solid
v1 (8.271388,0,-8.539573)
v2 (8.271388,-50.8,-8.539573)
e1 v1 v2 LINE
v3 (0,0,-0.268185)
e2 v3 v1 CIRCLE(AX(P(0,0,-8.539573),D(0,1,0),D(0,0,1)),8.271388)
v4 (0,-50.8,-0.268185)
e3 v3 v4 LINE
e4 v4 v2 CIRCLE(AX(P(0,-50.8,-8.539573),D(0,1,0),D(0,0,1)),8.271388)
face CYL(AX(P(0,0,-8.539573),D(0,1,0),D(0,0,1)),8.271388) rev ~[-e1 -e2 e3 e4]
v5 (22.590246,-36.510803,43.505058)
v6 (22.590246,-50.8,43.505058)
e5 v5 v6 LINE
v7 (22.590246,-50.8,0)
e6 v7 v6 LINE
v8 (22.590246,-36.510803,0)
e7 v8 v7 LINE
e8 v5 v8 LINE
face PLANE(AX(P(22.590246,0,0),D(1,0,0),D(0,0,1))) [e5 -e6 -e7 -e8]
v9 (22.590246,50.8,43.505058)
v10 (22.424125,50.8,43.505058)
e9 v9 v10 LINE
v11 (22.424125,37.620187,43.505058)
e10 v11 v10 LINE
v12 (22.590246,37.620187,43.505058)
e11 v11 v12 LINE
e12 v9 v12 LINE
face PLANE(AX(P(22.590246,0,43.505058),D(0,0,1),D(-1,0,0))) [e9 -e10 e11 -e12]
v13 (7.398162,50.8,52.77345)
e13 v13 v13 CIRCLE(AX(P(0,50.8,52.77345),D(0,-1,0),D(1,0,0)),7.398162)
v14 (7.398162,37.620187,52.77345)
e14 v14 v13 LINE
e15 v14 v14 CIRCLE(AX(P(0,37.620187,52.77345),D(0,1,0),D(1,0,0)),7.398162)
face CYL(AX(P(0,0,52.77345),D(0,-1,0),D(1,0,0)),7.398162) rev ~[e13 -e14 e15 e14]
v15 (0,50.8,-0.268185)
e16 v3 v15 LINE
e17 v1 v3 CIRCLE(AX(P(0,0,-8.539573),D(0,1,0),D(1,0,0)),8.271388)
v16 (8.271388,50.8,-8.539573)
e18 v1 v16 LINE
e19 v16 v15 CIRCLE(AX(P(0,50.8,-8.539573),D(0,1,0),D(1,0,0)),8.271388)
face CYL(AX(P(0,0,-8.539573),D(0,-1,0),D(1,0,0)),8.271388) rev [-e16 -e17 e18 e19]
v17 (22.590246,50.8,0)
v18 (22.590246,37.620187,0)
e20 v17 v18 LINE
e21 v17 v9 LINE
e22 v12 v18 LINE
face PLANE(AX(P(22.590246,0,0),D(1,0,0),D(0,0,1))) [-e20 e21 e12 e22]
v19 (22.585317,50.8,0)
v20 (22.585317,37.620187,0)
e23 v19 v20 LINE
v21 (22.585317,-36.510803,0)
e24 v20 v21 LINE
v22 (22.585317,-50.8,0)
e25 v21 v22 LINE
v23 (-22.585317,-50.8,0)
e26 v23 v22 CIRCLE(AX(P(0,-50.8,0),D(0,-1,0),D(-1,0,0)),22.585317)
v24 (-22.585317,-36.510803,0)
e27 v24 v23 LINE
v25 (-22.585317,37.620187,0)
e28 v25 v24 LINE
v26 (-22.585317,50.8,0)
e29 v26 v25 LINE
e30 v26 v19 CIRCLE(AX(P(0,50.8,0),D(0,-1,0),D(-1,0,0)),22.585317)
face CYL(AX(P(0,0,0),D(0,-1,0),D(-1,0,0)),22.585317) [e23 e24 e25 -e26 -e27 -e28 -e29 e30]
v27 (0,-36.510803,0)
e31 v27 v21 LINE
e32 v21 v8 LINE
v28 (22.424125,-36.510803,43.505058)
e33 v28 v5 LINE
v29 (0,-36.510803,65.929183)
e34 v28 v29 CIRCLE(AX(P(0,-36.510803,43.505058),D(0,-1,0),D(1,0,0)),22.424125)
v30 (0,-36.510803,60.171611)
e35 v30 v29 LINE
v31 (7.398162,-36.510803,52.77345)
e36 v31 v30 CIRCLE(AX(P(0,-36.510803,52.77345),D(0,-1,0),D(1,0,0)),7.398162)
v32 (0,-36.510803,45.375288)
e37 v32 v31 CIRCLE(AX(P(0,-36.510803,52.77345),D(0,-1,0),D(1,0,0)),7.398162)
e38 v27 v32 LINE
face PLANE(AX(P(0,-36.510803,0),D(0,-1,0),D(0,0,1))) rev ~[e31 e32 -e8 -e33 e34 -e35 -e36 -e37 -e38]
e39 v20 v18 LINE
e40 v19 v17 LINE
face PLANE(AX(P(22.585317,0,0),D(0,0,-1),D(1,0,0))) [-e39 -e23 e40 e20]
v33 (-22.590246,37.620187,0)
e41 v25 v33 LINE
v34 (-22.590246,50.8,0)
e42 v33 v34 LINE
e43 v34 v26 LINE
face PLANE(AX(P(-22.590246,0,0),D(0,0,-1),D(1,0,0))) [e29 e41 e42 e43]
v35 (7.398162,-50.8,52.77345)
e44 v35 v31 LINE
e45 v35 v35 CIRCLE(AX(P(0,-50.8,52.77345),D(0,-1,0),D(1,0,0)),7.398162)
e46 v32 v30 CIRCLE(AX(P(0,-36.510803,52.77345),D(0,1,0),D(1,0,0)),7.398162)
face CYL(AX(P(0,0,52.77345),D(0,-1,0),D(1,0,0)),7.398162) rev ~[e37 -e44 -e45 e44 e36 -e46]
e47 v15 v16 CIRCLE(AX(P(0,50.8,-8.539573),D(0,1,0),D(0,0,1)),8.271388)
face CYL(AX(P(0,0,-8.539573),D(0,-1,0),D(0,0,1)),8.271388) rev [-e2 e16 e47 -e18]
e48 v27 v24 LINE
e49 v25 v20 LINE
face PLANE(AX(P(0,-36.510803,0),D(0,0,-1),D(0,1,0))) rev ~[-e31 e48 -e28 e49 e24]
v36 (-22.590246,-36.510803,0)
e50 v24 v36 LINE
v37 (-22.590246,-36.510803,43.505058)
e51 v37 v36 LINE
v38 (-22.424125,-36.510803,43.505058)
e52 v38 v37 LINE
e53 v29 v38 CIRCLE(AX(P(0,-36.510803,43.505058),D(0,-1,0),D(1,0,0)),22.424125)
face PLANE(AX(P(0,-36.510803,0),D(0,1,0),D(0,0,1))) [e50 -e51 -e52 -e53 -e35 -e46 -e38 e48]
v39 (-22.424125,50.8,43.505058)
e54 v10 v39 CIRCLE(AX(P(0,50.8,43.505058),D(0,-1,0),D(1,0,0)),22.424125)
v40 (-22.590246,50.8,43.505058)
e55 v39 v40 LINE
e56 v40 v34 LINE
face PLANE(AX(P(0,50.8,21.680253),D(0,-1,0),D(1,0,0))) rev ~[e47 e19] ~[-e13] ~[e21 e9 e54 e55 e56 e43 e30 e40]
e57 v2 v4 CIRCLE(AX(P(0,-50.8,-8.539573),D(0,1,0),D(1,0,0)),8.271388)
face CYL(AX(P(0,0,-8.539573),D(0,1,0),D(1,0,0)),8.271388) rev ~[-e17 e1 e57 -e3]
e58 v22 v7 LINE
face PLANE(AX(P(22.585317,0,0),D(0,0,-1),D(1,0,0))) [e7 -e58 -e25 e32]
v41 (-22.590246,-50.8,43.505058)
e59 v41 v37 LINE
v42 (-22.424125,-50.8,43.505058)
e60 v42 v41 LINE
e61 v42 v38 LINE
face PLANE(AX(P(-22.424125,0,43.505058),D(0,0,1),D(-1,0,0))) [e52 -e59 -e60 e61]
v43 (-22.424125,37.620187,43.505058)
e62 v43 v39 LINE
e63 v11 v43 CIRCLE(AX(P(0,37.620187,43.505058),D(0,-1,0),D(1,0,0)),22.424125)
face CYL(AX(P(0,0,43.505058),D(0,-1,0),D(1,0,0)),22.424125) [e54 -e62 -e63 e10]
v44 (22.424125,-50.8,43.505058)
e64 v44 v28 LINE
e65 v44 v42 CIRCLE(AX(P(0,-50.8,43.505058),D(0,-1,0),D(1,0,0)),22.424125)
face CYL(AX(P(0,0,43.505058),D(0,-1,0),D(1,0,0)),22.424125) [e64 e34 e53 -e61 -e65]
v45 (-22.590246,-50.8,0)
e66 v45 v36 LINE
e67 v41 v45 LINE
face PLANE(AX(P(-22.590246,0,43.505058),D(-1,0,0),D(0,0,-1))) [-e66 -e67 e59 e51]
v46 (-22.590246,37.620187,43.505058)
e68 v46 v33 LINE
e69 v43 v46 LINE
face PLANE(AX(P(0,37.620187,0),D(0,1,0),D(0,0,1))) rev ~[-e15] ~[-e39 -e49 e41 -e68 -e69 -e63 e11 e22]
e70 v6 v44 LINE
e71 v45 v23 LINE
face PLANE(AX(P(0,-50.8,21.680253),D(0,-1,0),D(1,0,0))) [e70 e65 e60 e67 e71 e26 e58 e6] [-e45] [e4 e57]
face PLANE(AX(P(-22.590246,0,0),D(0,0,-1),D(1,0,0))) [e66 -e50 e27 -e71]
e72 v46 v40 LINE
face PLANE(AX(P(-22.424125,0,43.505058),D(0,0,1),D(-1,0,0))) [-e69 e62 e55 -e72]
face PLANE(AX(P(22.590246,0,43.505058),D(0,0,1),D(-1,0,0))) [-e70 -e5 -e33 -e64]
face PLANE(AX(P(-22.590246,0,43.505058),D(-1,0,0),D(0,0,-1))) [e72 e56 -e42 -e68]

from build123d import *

# Parameters (mm, degrees)
F0_R          = 7.3981618973
F1_DEPTH      = 50.8
F1_DEPTH_BACK = 50.8
F2_W          = 74.1309896111
F2_H          = 66.0332143307
F3_DEPTH      = 25.4
F3_DEPTH_BACK = 25.4


# Not quite as in the source:
# - the program builds the solid bodies; features that only make, move or delete a surface that nothing else refers to are left out


with BuildPart() as f1:
    # F0 (on Front) → F1 (new body, two sides)
    with BuildSketch(Plane.XZ) as f1_sk:
        with BuildLine():
            Line((-22.5902460515, 0), (-22.5853170946, 0))
            ThreePointArc((-22.5853170946, 0), (0, -22.5853170946), (22.5853170946, 0))
            Line((22.5853170946, 0), (22.5902460515, 0))
            Line((22.5902460515, 0), (22.5902460515, 43.5050576925))
            Line((22.5902460515, 43.5050576925), (22.4241250182, 43.5050576925))
            ThreePointArc((22.4241250182, 43.5050576925), (0, 65.9291827108), (-22.4241250182, 43.5050576925))
            Line((-22.4241250182, 43.5050576925), (-22.5902460515, 43.5050576925))
            Line((-22.5902460515, 43.5050576925), (-22.5902460515, 0))
        make_face()
        with BuildLine():
            ThreePointArc((0, -0.2681852946), (5.848754541, -2.6908187485), (8.2713879948, -8.5395732895))
            ThreePointArc((8.2713879948, -8.5395732895), (-5.848754541, -14.3883278304), (0, -0.2681852946))
        make_face(mode=Mode.SUBTRACT)
        with Locations((0, 52.7734495699)):
            Circle(F0_R, mode=Mode.SUBTRACT)
    extrude(amount=F1_DEPTH)
    extrude(f1_sk.sketch, amount=-F1_DEPTH_BACK)

    # F2 (on Right) → F3 (cut, two sides)
    with BuildSketch(Plane.YZ) as f3_sk:
        with Locations((0.5546920002, 33.0166071653)):
            Rectangle(F2_W, F2_H)
    extrude(amount=-F3_DEPTH, mode=Mode.SUBTRACT)
    extrude(f3_sk.sketch, amount=F3_DEPTH_BACK, mode=Mode.SUBTRACT)


solid = f1.part
